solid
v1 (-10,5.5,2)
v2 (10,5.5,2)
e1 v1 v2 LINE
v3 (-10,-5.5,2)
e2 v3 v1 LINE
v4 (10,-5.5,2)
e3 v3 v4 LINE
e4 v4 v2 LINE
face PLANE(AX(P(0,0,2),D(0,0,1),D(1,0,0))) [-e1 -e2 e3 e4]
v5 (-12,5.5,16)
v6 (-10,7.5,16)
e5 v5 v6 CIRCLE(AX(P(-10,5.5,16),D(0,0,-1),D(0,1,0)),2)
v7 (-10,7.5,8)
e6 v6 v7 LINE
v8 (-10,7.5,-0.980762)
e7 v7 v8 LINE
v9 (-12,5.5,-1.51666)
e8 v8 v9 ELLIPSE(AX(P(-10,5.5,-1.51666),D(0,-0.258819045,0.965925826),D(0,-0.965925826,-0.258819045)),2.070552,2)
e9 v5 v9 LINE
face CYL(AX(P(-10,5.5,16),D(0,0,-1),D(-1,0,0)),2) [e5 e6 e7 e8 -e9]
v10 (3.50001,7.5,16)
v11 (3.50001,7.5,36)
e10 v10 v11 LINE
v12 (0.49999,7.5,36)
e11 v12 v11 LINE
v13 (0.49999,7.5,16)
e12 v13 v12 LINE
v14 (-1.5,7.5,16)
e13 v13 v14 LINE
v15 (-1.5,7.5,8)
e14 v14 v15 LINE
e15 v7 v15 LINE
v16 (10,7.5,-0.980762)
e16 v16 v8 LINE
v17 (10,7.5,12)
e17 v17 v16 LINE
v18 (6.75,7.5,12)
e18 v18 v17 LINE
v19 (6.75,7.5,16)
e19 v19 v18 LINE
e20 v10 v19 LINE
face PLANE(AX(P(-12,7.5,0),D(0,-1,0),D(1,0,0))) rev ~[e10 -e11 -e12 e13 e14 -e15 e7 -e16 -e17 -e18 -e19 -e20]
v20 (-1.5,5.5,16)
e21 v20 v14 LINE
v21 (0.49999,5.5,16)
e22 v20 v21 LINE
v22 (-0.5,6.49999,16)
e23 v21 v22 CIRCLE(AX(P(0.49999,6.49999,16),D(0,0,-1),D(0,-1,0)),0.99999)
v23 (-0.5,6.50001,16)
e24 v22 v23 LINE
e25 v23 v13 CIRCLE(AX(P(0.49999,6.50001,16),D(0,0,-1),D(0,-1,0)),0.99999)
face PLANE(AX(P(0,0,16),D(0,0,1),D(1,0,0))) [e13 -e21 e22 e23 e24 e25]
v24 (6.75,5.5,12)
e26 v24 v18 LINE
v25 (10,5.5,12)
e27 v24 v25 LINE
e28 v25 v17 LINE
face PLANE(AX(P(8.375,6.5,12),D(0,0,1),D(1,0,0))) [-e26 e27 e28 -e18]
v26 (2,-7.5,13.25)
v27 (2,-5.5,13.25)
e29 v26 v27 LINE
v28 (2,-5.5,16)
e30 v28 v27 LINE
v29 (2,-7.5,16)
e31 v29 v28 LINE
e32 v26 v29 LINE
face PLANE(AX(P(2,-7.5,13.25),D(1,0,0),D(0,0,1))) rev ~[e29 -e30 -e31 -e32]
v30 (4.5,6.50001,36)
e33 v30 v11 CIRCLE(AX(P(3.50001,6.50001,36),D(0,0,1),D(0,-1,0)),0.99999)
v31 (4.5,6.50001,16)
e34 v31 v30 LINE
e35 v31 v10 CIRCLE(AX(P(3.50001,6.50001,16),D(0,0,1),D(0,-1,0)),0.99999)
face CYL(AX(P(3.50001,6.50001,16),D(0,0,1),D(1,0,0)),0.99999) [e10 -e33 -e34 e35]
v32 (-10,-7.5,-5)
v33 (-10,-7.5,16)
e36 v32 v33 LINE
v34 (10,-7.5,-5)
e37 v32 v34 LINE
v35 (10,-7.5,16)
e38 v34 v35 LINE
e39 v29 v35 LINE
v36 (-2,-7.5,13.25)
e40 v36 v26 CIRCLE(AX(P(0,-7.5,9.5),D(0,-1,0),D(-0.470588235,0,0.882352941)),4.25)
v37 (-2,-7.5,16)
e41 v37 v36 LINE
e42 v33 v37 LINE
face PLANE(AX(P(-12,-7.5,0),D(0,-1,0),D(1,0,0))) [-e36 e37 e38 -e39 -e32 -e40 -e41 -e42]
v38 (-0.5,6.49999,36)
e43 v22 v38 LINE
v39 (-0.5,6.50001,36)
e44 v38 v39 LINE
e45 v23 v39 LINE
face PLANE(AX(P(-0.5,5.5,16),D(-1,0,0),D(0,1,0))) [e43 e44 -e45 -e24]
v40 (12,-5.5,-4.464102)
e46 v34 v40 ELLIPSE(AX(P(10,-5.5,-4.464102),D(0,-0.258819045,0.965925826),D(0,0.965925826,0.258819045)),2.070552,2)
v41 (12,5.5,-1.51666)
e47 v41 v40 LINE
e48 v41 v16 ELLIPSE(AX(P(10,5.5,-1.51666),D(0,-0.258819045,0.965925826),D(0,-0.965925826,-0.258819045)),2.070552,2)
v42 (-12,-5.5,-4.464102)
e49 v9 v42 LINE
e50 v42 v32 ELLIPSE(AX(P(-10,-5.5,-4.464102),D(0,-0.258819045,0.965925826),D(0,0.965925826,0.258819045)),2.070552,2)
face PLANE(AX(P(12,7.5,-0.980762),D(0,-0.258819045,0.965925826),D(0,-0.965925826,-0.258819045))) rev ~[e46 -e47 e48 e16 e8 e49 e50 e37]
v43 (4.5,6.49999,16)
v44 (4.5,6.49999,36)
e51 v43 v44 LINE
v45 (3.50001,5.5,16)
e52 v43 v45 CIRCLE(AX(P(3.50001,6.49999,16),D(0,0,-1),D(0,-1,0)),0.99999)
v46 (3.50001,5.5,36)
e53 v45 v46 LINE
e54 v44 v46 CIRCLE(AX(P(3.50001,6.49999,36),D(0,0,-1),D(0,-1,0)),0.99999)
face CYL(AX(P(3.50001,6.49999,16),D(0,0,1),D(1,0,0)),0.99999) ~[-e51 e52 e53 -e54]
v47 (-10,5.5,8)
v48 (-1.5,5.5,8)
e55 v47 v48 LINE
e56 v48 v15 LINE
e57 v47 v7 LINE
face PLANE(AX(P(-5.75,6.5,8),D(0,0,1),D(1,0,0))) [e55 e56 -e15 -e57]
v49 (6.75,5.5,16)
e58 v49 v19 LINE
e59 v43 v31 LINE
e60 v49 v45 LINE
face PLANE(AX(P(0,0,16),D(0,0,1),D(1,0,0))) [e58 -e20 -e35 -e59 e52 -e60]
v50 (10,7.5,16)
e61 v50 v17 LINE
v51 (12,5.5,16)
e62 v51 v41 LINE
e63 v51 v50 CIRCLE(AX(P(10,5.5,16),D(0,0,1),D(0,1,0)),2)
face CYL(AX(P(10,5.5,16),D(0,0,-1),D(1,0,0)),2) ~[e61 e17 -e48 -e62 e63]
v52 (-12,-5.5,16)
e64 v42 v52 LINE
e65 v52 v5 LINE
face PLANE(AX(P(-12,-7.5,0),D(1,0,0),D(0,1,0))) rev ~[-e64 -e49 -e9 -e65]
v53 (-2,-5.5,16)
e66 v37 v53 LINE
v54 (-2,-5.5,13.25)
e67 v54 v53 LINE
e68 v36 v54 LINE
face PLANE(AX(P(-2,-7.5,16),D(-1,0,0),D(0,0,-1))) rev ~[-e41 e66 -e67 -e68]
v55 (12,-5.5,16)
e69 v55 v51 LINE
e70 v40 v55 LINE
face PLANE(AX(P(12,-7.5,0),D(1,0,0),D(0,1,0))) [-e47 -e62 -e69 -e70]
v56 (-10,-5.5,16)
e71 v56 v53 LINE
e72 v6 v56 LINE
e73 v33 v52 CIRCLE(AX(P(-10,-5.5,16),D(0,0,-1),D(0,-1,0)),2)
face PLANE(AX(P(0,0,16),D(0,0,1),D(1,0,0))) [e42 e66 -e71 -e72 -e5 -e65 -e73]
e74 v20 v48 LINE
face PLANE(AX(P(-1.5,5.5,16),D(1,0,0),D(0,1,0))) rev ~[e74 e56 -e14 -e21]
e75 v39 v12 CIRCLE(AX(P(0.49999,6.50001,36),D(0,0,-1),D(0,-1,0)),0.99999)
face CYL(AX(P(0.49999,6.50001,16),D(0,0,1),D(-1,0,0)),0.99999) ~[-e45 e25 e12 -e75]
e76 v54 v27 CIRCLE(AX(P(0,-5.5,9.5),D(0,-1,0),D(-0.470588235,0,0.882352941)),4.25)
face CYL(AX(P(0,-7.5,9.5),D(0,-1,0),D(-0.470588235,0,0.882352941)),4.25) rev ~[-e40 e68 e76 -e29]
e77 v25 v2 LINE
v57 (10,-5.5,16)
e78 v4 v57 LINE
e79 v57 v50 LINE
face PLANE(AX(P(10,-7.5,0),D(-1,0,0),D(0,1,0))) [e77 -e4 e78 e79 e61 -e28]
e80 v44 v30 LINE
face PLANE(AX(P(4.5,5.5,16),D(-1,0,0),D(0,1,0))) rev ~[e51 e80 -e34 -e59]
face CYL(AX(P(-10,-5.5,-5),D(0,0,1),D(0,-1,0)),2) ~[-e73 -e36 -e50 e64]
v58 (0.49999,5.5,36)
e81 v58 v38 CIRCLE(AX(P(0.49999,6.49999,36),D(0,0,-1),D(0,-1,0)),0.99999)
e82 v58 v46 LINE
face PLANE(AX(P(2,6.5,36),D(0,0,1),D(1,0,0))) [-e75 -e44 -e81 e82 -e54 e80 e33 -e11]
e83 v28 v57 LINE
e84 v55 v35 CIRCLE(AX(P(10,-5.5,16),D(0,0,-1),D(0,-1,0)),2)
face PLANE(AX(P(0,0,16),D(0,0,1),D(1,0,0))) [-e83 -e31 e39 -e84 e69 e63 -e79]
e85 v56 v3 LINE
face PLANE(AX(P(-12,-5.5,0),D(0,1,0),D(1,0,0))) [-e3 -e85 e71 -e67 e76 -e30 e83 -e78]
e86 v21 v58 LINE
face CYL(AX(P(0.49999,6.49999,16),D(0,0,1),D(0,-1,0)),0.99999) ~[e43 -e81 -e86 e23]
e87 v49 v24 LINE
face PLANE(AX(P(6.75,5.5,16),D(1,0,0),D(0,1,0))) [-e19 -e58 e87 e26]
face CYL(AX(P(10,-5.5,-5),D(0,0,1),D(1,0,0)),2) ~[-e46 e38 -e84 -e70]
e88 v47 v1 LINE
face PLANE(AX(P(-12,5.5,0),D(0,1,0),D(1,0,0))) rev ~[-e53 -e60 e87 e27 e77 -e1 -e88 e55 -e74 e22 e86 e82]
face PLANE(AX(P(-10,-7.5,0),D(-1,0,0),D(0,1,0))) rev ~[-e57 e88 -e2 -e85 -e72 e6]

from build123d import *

# Parameters (mm, degrees)
F0_W      = 24
F0_H      = 15
F1_DEPTH  = 16
F2_T      = -2
F4_DEPTH  = 5
F5_W      = 5
F5_H      = 2
F6_DEPTH  = 20
F7_DEPTH  = 5
F9_R      = 0.99999
F10_R     = 2
F11_W     = 8.5
F11_H     = 2
F12_DEPTH = 8
F13_W     = 3.25
F13_H     = 2
F14_DEPTH = 4
F15_DEPTH = 25


# Not quite as in the source:
# - a fillet or chamfer is up to 0.001 mm smaller than in the source, because OpenCascade refuses the exact size


with BuildPart() as f1:
    # F0 (on Top) → F1 (new body)
    with BuildSketch(Plane.XY):
        Rectangle(F0_W, F0_H)
    extrude(amount=F1_DEPTH)

    # F2
    f2_openings = [f1.faces().sort_by_distance(p)[0] for p in [
        (0, 0, 16),
    ]]
    offset(amount=F2_T, openings=f2_openings)

    # F3 (on face) → F4 (cut)
    with BuildSketch(Plane.XZ.offset(7.5)):
        with BuildLine():
            Line((-2, 16), (-2, 13.25))
            ThreePointArc((-2, 13.25), (0, 5.25), (2, 13.25))
            Line((2, 13.25), (2, 16))
            Line((2, 16), (-2, 16))
        make_face()
    extrude(amount=-F4_DEPTH, mode=Mode.SUBTRACT)

    # F5 (on face) → F6 (join)
    with BuildSketch(Plane.XY.offset(16)):
        with Locations((2, 6.5)):
            Rectangle(F5_W, F5_H)
    extrude(amount=F6_DEPTH)

    # F7 (add): a face of the model
    f7_faces = [f1.faces().sort_by_distance(p)[0] for p in [
        (0, 0, 0),
    ]]
    extrude(f7_faces, amount=F7_DEPTH)

    # F9 (radius 1 in the source; OpenCascade refuses exactly that, so slightly less here)
    f9_edges = [f1.edges().sort_by_distance(p)[0] for p in [
        (4.5, 5.5, 26),
        (4.5, 7.5, 26),
        (-0.5, 5.5, 26),
        (-0.5, 7.5, 26),
    ]]
    fillet(f9_edges, radius=F9_R)

    # F10
    f10_edges = [f1.edges().sort_by_distance(p)[0] for p in [
        (12, -7.5, 5.5),
        (-12, -7.5, 5.5),
        (-12, 7.5, 5.5),
        (12, 7.5, 5.5),
    ]]
    fillet(f10_edges, radius=F10_R)

    # F11 (on face) → F12 (cut)
    with BuildSketch(Plane.XY.offset(16)):
        with Locations((-5.75, 6.5)):
            Rectangle(F11_W, F11_H)
    extrude(amount=-F12_DEPTH, mode=Mode.SUBTRACT)

    # F13 (on face) → F14 (cut)
    with BuildSketch(Plane.XY.offset(16)):
        with Locations((8.375, 6.5)):
            Rectangle(F13_W, F13_H)
    extrude(amount=-F14_DEPTH, mode=Mode.SUBTRACT)

    # F8 (on face) → F15 (cut)
    with BuildSketch(Plane.YZ.offset(12)):
        Polygon((7.5, -0.9807621135), (-7.5, -5), (7.5, -5), align=None)
    extrude(amount=-F15_DEPTH, mode=Mode.SUBTRACT)


solid = f1.part
